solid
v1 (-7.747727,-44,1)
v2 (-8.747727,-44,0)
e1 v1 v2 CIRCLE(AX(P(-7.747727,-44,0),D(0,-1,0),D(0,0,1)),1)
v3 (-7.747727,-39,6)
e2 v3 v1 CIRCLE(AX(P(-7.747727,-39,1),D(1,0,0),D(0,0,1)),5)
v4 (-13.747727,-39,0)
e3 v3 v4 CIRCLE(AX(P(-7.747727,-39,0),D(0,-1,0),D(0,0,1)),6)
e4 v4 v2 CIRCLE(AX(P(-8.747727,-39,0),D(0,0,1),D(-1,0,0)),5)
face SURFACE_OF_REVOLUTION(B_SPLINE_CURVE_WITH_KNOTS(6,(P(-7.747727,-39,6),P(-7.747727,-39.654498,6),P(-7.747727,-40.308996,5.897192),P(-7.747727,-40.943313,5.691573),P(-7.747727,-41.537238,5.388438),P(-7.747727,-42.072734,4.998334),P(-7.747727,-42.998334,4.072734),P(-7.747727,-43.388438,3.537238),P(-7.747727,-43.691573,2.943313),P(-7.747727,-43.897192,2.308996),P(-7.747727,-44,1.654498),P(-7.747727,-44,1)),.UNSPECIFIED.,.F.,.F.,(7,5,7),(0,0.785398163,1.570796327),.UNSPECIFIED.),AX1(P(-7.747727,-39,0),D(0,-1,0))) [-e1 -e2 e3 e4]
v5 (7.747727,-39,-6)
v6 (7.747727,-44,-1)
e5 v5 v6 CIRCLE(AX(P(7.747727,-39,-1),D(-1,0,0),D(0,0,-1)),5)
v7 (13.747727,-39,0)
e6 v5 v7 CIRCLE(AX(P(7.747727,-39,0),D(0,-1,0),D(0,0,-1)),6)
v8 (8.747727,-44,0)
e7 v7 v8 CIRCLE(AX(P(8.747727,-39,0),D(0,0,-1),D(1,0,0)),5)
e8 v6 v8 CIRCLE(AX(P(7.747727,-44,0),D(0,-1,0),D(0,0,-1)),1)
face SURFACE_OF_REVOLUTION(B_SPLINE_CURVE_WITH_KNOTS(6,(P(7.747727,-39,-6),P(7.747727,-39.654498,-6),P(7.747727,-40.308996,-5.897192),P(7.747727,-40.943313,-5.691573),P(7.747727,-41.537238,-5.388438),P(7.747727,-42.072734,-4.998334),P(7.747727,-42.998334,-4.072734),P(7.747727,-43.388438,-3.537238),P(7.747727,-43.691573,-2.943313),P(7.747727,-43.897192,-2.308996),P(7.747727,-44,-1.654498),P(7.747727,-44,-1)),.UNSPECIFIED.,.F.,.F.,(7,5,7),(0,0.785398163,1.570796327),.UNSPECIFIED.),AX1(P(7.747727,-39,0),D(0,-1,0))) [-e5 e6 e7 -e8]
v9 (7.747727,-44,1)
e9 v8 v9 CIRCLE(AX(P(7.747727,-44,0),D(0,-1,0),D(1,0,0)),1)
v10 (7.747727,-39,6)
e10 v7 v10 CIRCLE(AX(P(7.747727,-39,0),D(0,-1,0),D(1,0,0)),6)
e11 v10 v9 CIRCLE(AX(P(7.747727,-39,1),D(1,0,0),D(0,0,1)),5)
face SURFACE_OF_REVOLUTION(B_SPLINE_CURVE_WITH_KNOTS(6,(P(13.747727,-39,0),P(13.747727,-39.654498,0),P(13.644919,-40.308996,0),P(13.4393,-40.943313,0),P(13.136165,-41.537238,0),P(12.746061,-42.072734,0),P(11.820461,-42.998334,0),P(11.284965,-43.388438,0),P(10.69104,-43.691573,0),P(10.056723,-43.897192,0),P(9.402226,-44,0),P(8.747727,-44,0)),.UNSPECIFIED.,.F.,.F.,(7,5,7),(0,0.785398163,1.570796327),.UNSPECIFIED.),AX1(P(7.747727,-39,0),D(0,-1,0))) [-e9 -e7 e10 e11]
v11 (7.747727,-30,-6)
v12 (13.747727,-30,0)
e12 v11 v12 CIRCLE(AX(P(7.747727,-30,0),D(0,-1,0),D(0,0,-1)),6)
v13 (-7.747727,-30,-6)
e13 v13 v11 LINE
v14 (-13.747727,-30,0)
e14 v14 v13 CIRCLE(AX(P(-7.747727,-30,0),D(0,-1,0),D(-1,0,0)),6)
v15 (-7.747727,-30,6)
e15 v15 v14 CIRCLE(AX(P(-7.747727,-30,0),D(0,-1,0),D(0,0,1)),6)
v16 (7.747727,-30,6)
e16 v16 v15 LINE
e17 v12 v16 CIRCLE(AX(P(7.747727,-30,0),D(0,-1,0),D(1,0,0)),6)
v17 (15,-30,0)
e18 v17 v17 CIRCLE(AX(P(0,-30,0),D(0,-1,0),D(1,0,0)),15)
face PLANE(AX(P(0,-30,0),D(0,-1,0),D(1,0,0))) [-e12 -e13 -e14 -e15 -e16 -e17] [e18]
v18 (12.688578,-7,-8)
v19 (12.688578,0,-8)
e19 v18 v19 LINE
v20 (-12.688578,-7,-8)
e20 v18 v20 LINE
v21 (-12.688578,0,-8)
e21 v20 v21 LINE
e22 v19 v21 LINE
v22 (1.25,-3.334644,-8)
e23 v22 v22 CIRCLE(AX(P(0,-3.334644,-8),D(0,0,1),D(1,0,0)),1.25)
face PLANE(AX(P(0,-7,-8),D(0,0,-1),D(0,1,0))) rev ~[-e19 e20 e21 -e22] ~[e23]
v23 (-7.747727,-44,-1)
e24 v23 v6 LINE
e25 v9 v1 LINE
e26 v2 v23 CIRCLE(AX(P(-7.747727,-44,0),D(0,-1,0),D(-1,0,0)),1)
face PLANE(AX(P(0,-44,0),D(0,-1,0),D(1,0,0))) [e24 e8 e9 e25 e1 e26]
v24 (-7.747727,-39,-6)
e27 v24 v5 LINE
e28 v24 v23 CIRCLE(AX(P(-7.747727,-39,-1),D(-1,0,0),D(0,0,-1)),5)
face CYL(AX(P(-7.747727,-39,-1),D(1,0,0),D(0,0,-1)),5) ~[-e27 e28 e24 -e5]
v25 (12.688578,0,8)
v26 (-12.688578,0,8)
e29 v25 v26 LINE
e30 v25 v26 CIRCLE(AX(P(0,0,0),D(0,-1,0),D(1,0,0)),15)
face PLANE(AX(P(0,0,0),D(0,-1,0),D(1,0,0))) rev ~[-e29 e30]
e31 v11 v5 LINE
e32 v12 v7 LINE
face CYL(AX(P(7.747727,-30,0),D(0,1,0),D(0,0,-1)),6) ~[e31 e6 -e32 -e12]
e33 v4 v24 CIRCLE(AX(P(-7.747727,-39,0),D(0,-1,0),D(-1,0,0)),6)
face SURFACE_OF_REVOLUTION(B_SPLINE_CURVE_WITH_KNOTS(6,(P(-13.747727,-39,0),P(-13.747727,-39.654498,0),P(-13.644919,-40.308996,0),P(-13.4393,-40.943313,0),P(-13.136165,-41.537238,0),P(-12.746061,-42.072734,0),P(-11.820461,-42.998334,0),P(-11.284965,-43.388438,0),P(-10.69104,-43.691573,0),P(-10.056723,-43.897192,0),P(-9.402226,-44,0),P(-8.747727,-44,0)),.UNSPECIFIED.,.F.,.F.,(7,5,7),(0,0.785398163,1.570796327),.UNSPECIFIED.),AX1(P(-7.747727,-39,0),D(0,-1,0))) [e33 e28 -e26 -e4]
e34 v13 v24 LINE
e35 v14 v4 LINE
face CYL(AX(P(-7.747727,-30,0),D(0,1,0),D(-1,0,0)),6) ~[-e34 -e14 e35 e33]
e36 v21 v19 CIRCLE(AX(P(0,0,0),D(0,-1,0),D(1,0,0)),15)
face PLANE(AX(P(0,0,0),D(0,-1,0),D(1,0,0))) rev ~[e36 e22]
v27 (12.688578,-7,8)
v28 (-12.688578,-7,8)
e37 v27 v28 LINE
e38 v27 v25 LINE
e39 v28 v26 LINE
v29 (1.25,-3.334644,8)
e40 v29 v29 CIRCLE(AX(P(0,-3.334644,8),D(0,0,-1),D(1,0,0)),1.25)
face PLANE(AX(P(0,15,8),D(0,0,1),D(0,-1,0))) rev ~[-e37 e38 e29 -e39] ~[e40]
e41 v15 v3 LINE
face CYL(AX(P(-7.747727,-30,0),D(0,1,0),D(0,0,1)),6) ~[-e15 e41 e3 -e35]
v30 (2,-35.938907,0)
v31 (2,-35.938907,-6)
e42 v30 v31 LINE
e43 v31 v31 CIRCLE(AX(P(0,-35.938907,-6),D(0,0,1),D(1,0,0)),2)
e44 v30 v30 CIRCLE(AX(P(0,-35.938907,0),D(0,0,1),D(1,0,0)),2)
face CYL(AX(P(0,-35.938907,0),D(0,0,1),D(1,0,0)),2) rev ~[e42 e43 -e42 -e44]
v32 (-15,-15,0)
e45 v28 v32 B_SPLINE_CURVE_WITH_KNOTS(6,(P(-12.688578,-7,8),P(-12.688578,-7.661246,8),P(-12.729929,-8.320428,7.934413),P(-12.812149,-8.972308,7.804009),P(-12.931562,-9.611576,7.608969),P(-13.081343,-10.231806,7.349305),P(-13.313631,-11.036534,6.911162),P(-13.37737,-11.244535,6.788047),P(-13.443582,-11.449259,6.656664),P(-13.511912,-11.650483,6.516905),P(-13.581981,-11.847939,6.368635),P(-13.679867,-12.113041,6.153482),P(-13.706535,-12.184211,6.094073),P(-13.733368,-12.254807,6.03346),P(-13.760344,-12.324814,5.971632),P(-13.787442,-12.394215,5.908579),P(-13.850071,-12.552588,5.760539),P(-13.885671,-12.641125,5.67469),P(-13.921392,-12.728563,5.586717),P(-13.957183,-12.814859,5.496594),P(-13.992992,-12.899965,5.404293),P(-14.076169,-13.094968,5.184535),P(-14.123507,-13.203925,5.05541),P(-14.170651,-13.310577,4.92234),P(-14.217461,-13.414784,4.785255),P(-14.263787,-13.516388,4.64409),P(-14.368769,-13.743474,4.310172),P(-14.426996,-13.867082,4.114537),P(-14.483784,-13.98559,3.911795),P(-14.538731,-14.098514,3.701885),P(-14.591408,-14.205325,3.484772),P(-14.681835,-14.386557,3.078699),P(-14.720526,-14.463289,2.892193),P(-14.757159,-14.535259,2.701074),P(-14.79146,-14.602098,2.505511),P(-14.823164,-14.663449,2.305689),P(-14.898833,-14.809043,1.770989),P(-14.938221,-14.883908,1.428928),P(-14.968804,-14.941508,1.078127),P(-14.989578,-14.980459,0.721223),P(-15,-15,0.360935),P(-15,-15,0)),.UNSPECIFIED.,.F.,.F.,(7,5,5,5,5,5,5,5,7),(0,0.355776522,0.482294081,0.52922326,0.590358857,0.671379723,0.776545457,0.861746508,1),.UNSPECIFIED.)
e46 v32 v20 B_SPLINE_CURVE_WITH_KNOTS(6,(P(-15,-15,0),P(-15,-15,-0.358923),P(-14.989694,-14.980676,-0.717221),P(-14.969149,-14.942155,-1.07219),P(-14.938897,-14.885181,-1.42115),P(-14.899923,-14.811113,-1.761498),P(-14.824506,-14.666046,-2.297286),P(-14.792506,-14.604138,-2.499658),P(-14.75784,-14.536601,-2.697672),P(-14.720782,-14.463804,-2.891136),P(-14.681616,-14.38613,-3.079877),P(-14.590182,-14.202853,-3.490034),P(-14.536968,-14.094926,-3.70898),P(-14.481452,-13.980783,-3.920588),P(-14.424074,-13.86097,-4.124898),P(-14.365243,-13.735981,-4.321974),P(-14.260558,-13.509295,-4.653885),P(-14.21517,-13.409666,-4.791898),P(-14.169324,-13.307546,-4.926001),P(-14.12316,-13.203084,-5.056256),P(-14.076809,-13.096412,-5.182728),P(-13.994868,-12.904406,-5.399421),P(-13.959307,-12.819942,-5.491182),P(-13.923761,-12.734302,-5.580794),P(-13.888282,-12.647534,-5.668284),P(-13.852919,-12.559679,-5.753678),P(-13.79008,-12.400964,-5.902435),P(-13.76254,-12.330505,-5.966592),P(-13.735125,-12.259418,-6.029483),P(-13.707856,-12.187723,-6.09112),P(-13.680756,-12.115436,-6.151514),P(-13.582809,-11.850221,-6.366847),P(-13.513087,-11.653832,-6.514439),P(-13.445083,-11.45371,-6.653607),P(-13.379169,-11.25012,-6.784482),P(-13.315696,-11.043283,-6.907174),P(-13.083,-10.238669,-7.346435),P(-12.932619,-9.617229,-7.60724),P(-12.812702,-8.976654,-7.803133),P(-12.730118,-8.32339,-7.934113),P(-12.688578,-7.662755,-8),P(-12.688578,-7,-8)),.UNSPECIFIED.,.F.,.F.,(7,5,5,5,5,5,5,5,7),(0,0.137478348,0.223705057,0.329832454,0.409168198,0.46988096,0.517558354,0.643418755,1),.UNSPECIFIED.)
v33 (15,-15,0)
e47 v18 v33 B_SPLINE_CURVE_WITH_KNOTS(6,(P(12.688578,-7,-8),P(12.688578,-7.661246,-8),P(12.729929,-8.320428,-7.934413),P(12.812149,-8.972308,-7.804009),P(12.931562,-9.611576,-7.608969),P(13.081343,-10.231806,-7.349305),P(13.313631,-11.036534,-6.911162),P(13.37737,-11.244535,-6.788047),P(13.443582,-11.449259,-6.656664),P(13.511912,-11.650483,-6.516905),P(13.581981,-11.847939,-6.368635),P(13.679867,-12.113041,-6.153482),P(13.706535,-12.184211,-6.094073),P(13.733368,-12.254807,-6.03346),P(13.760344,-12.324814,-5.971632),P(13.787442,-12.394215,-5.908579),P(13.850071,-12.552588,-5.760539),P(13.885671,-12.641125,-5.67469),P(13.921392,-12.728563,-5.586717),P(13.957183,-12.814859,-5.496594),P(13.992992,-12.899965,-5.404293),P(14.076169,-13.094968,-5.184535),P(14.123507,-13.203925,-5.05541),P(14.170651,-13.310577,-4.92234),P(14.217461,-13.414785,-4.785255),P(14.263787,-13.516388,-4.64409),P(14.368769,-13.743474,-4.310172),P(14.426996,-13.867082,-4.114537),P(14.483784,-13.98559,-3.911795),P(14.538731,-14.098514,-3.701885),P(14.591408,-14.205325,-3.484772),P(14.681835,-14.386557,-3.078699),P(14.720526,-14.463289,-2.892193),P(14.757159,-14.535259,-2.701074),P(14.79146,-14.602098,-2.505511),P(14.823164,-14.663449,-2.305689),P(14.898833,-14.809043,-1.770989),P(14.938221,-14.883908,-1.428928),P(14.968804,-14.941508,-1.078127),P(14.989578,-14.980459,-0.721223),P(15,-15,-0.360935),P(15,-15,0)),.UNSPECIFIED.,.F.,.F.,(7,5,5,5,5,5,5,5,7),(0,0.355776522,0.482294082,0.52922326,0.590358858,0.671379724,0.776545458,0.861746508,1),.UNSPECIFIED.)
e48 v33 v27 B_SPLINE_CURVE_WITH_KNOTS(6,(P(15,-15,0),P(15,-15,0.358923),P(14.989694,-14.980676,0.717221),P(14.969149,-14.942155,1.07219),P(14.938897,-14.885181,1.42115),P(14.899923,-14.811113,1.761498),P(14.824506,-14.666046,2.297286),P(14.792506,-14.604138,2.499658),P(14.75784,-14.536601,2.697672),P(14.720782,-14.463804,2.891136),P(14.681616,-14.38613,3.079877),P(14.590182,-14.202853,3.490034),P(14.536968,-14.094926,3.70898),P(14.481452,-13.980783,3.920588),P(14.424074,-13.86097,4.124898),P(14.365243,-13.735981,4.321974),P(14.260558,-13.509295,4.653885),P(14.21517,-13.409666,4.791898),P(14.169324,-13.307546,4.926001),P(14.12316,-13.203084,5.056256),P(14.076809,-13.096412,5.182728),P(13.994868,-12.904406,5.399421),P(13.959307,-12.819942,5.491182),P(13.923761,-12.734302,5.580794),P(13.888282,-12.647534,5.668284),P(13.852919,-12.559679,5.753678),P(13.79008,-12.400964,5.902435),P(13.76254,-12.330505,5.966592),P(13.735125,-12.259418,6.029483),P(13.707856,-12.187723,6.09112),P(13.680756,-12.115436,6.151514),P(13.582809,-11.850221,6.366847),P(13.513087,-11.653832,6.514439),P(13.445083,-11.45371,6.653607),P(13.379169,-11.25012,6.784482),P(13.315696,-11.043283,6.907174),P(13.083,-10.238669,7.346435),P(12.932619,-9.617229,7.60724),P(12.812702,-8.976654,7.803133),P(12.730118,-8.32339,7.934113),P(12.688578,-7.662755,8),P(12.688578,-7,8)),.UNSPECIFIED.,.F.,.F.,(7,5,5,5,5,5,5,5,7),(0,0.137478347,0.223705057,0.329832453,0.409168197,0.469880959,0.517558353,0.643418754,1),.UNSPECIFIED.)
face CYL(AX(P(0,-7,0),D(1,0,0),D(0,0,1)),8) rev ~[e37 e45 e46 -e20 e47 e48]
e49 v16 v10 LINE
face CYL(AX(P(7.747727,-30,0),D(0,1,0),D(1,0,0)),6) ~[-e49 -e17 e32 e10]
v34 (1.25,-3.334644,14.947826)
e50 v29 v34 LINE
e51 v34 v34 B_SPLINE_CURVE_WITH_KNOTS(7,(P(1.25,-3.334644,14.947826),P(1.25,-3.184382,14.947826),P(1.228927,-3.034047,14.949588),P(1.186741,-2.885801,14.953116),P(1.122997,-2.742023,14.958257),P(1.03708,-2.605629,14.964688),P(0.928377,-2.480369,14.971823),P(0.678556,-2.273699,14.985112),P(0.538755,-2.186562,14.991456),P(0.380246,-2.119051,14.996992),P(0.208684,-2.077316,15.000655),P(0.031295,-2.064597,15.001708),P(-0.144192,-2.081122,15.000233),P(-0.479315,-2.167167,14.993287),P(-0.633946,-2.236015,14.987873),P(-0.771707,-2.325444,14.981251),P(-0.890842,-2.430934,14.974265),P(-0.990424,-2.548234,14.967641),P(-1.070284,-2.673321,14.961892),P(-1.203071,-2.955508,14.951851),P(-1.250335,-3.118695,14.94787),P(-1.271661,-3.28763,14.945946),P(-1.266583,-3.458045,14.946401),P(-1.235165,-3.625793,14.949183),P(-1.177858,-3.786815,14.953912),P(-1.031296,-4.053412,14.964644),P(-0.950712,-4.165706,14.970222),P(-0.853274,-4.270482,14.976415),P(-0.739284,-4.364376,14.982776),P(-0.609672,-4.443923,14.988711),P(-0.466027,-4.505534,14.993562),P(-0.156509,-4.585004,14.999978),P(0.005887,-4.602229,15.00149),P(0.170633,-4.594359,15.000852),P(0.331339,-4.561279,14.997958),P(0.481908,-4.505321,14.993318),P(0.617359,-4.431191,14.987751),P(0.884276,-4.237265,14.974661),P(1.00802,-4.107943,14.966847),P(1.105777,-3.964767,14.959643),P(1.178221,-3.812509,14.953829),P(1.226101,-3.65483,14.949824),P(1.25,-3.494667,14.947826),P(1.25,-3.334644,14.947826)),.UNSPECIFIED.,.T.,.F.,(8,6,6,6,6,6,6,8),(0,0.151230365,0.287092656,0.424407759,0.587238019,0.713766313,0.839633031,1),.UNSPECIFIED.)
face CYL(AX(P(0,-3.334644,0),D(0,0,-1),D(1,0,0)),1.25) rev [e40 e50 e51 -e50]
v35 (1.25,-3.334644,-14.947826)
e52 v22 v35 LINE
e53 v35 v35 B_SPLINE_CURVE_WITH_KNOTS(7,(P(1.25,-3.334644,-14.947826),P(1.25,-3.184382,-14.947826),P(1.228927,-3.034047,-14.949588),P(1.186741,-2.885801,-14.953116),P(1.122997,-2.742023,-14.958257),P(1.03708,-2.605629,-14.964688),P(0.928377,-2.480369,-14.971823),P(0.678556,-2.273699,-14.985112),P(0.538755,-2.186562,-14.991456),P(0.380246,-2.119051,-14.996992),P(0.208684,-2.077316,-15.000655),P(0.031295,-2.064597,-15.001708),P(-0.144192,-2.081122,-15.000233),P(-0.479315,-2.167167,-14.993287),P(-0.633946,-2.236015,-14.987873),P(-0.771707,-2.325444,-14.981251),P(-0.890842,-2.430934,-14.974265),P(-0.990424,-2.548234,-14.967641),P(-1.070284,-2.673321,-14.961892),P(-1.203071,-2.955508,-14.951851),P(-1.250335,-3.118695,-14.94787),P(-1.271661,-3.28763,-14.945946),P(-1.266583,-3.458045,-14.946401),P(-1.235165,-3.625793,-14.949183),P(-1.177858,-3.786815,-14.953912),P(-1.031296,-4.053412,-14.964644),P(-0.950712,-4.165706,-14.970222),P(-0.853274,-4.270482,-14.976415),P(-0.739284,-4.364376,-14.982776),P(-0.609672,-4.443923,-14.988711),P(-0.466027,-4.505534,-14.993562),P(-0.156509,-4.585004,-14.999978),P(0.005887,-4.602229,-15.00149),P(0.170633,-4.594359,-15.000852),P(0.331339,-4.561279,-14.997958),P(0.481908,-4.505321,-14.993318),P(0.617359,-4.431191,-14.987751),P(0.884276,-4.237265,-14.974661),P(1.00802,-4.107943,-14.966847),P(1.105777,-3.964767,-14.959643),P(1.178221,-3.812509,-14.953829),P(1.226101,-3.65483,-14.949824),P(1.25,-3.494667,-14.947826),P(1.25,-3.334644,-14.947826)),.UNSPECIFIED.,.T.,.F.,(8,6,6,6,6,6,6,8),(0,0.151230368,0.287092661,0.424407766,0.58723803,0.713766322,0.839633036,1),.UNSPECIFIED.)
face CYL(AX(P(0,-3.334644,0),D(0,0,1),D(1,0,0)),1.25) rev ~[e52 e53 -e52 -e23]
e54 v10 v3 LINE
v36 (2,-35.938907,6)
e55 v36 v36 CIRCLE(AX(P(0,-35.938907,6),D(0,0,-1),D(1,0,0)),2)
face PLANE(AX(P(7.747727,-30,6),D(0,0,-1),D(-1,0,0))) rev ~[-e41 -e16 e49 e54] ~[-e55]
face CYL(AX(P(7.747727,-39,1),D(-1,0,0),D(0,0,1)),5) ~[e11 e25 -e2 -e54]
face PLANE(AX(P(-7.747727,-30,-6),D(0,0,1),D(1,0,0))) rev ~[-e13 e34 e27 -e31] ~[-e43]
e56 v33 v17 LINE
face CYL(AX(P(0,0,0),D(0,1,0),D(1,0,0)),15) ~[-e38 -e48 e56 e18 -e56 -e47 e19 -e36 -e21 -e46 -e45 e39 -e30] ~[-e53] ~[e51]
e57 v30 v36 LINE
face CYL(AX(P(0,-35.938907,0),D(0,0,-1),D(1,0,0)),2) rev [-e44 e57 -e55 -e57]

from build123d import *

# Parameters (mm, degrees)
F0_R           = 15
F1_DEPTH       = 30
F3_DEPTH       = 25
F3_DEPTH_BACK  = 25
F5_DEPTH       = 14
F6_R           = 5
F7_R           = 2
F8_DEPTH       = 25
F8_DEPTH_BACK  = 25
F9_R           = 1.25
F10_DEPTH      = 25
F10_DEPTH_BACK = 25


with BuildPart() as f1:
    # F0 (on Front) → F1 (new body)
    with BuildSketch(Plane.XZ):
        Circle(F0_R)
    extrude(amount=F1_DEPTH)

    # F2 (on Right) → F3 (cut, two sides)
    with BuildSketch(Plane.YZ) as f3_sk:
        with BuildLine():
            Line((15, 8), (-7, 8))
            ThreePointArc((-7, 8), (-12.6568542495, 5.6568542495), (-15, 0))
            ThreePointArc((-15, 0), (-12.6568542495, -5.6568542495), (-7, -8))
            Line((-7, -8), (15, -8))
            Line((15, -8), (15, 8))
        make_face()
    extrude(amount=-F3_DEPTH, mode=Mode.SUBTRACT)
    extrude(f3_sk.sketch, amount=F3_DEPTH_BACK, mode=Mode.SUBTRACT)

    # F4 (on face) → F5 (join)
    with BuildSketch(Plane.XZ.offset(30)):
        with BuildLine():
            ThreePointArc((13.7477270849, 0), (11.990367772, 4.2426406871), (7.7477270849, 6))
            Line((7.7477270849, 6), (-7.7477270849, 6))
            ThreePointArc((-7.7477270849, 6), (-11.990367772, 4.2426406871), (-13.7477270849, 0))
            ThreePointArc((-13.7477270849, 0), (-11.990367772, -4.2426406871), (-7.7477270849, -6))
            Line((-7.7477270849, -6), (7.7477270849, -6))
            ThreePointArc((7.7477270849, -6), (11.990367772, -4.2426406871), (13.7477270849, 0))
        make_face()
    extrude(amount=F5_DEPTH)

    # F6
    f6_edges = [f1.edges().sort_by_distance(p)[0] for p in [
        (13.747727, -44, 0),
        (0, -44, 6),
        (-13.747727, -44, 0),
        (0, -44, -6),
    ]]
    fillet(f6_edges, radius=F6_R)

    # F7 (on Top) → F8 (cut, two sides)
    with BuildSketch(Plane.XY) as f8_sk:
        with Locations((0, -35.9389074147)):
            Circle(F7_R)
    extrude(amount=-F8_DEPTH, mode=Mode.SUBTRACT)
    extrude(f8_sk.sketch, amount=F8_DEPTH_BACK, mode=Mode.SUBTRACT)

    # F9 (on Top) → F10 (cut, two sides)
    with BuildSketch(Plane.XY) as f10_sk:
        with Locations((0, -3.3346442506)):
            Circle(F9_R)
    extrude(amount=-F10_DEPTH, mode=Mode.SUBTRACT)
    extrude(f10_sk.sketch, amount=F10_DEPTH_BACK, mode=Mode.SUBTRACT)


solid = f1.part
